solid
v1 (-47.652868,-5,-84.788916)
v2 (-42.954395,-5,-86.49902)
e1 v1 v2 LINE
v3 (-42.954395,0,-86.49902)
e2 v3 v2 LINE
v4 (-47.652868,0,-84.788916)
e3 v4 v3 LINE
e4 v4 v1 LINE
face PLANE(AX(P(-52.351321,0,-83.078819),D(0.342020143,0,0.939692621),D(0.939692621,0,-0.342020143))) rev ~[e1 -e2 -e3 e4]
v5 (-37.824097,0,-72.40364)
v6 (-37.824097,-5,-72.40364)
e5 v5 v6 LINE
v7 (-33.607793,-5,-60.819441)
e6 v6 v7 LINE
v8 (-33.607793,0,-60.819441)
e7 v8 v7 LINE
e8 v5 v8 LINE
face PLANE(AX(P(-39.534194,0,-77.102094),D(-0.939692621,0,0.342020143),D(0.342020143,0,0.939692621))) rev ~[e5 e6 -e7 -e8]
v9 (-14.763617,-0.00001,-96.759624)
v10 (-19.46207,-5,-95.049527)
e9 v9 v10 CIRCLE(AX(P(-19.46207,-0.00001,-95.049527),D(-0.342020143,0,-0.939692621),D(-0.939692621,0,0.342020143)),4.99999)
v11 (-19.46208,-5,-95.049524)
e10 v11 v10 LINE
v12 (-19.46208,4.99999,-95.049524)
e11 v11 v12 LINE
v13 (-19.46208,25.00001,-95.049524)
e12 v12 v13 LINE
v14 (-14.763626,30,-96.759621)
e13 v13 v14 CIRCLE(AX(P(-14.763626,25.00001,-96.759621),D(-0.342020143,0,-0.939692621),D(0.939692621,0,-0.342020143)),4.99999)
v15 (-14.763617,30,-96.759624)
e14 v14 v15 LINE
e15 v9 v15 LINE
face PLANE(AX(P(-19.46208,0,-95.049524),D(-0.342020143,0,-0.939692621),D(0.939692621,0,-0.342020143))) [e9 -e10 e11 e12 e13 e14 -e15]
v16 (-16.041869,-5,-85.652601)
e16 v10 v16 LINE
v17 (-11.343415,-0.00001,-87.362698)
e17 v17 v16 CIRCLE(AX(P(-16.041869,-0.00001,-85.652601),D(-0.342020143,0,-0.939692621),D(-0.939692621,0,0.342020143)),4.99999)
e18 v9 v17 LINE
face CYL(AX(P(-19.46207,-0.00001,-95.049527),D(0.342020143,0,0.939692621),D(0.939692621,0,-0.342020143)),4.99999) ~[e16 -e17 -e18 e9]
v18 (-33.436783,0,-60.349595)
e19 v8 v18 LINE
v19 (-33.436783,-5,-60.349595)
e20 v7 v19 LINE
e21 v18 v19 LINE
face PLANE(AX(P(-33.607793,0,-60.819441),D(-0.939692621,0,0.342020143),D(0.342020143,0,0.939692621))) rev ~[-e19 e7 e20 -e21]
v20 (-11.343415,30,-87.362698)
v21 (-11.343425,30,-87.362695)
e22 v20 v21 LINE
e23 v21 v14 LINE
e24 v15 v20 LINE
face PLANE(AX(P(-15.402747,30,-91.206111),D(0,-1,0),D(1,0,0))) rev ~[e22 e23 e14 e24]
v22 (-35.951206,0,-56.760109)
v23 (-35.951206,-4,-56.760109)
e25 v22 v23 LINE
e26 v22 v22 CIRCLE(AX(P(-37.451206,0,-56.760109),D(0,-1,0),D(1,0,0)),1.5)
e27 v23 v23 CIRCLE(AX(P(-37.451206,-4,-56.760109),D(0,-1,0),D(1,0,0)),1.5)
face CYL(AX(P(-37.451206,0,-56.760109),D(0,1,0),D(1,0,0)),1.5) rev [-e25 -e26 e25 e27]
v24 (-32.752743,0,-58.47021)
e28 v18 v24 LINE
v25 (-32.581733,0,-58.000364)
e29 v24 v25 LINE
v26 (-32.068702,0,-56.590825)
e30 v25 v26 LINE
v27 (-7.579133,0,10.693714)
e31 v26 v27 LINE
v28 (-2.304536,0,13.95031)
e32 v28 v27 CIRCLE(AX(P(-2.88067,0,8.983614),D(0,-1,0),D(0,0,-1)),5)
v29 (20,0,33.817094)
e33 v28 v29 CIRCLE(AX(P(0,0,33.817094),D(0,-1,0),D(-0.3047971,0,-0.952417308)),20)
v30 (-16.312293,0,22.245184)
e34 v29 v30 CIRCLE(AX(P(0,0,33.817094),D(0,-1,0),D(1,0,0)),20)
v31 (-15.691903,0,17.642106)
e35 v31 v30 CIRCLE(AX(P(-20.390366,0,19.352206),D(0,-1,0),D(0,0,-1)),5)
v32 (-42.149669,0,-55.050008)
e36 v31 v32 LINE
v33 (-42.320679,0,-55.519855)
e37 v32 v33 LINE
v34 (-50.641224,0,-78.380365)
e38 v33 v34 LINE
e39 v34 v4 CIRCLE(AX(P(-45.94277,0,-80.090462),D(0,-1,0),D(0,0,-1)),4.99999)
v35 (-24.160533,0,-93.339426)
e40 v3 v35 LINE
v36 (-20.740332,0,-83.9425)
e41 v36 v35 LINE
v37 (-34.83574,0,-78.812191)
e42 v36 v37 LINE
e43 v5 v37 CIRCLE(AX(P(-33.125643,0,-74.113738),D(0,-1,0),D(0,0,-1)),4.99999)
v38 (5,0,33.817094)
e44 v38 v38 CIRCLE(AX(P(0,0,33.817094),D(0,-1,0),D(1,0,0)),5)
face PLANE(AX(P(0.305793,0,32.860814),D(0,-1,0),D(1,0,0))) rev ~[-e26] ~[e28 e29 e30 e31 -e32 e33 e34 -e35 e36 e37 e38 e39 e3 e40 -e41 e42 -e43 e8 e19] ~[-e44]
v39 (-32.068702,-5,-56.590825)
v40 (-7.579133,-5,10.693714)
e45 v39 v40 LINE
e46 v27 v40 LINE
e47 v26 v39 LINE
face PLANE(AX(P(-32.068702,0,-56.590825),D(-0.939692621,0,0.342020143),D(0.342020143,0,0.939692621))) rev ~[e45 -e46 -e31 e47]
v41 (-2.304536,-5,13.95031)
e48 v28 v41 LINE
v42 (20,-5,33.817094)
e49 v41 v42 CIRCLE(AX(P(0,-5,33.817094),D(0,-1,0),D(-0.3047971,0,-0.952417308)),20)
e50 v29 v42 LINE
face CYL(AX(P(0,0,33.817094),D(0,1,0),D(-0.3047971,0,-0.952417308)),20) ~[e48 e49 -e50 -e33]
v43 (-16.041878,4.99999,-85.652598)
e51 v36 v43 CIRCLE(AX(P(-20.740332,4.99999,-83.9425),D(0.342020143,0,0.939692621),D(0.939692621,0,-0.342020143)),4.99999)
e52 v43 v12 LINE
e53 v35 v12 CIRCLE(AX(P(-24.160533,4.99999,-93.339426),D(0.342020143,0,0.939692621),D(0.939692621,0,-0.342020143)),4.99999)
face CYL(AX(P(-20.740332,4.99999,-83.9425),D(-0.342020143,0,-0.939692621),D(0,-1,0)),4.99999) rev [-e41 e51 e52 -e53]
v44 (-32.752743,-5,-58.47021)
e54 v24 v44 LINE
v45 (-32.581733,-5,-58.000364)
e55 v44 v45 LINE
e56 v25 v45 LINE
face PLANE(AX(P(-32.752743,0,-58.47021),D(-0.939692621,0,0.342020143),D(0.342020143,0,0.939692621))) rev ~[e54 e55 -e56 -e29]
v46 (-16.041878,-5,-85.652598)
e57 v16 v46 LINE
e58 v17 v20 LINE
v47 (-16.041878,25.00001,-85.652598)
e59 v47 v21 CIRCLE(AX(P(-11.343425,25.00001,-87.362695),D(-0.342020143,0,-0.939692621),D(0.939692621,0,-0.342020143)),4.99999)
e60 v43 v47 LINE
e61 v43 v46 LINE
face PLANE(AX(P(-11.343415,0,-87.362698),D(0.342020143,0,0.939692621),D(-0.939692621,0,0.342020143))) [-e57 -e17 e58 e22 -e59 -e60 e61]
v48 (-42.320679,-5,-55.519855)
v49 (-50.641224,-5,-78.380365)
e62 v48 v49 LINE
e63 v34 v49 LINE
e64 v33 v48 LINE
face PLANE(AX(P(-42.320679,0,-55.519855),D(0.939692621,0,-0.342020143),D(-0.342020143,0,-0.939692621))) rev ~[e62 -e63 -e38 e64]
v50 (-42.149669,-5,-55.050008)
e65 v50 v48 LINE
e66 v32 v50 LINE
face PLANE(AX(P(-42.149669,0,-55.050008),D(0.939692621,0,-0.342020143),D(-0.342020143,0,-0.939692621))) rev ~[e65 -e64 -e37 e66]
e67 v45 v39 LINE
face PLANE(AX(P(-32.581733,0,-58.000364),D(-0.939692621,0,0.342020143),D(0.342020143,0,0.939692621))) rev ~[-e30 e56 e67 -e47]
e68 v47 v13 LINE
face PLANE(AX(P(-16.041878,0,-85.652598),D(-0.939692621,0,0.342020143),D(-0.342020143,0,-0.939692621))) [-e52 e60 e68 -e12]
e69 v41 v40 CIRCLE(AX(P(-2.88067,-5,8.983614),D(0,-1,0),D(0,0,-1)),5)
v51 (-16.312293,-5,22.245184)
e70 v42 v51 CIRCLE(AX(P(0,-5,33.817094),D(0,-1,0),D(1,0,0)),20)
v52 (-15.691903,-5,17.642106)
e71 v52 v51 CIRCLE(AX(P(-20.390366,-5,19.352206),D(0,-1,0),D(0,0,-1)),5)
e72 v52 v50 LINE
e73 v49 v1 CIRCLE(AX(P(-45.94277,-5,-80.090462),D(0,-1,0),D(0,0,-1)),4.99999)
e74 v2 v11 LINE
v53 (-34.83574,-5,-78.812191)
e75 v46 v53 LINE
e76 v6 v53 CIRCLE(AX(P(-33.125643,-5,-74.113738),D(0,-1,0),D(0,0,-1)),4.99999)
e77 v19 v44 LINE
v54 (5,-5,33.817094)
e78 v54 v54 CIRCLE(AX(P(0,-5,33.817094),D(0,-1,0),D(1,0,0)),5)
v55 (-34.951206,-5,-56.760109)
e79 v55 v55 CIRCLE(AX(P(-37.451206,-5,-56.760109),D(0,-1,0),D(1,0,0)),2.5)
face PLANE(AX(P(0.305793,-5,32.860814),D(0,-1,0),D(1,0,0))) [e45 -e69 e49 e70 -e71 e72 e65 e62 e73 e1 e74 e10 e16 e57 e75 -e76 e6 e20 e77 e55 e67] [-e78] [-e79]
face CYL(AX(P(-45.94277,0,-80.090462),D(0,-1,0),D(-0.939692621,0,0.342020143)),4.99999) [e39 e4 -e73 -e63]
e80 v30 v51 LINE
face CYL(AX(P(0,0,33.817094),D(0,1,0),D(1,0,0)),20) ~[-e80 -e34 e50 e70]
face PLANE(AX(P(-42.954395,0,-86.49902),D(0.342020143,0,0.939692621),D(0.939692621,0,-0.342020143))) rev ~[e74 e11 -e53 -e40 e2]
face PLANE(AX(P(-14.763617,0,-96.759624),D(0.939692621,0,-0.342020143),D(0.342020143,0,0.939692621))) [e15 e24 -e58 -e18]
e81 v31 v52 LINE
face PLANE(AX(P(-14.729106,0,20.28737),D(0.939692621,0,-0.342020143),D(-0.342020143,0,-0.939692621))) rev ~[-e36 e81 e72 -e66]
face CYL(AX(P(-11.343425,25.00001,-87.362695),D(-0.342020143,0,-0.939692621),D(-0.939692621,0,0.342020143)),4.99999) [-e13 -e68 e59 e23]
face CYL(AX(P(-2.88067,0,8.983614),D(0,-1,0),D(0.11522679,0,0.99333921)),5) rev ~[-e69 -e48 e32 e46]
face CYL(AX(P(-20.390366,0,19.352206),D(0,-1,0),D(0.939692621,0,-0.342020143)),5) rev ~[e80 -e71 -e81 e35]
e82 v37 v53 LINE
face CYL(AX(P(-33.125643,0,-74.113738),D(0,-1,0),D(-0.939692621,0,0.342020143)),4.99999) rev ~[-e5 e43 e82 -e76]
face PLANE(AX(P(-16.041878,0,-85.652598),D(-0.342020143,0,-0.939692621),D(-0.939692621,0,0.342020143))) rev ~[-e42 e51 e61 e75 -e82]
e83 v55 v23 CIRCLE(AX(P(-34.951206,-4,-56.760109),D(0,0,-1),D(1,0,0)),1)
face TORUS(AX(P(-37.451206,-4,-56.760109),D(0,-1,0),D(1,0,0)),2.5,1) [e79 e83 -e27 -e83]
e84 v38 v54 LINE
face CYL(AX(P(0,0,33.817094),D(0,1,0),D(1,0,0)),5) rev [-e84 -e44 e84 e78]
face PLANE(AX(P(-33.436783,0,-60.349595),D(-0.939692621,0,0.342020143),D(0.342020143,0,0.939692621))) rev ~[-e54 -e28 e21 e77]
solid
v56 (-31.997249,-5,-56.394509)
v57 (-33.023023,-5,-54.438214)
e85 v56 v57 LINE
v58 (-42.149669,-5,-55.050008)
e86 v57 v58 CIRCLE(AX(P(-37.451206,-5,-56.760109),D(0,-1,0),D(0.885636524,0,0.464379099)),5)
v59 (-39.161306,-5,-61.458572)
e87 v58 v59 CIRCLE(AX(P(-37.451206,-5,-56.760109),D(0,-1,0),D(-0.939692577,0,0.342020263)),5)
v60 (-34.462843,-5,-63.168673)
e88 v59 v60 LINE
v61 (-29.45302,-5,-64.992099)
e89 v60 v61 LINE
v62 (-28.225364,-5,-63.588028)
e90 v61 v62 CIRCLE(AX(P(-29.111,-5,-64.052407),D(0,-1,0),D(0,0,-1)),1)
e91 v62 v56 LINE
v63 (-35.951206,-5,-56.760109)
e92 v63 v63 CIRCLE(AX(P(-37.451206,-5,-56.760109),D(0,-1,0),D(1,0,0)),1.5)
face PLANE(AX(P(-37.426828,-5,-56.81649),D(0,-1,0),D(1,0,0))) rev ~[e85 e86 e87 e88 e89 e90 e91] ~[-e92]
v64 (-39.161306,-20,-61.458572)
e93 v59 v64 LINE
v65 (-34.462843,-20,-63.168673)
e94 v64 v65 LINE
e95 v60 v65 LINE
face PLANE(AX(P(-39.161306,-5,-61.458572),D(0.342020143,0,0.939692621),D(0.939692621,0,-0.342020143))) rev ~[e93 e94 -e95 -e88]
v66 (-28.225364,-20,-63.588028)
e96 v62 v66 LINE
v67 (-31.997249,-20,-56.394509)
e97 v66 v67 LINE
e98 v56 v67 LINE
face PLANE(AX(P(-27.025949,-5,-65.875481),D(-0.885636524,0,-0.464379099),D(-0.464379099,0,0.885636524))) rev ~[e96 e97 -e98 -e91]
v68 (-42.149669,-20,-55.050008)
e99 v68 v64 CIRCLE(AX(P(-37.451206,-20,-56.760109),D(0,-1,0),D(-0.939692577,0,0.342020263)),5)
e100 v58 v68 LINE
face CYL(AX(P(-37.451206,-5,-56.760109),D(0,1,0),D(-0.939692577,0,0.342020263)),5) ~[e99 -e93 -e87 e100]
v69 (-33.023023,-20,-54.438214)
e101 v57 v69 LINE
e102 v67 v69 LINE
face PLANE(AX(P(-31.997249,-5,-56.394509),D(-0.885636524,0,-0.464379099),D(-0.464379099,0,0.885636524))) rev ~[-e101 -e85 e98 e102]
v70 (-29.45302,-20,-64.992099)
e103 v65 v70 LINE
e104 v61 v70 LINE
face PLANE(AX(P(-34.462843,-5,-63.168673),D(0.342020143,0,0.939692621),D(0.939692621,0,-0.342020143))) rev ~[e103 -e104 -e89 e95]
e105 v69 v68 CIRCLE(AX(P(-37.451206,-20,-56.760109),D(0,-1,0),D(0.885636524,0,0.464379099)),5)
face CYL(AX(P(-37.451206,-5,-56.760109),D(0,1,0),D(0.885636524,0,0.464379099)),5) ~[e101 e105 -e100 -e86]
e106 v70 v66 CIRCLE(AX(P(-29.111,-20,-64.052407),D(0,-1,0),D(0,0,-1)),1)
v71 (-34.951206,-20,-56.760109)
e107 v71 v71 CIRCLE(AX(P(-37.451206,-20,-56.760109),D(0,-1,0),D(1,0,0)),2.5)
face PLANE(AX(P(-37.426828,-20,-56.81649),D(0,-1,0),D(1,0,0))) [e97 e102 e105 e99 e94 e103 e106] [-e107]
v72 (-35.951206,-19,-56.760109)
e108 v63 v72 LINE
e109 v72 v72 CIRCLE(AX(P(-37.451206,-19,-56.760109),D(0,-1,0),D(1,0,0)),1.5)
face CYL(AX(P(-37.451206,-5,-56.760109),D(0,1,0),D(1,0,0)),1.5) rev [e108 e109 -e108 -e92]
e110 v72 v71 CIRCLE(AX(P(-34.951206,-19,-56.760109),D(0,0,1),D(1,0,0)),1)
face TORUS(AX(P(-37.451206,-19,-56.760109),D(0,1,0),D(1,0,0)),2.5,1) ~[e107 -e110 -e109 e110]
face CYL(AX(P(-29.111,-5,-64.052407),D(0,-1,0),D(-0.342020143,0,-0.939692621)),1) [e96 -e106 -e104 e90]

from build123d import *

# Parameters (mm, degrees)
F0_R     = 5
F0_R_2   = 1.5
F1_DEPTH = 5
F2_DEPTH = 30
F4_R     = 4.99999
F5_R     = 5
F3_R     = 1.5
F6_DEPTH = 15
F7_R     = 1
F7_2_R   = 1


# Not quite as in the source:
# - a fillet or chamfer is up to 0.001 mm smaller than in the source, because OpenCascade refuses the exact size
# - a feature names something its author has since deleted; it is built from what else it names


with BuildPart() as f1:
    # F0 (on Front) → F1 (new body)
    with BuildSketch(Plane.XZ):
        with BuildLine():
            ThreePointArc((20, 33.8170940264), (-7.2600924867, 52.4528407806), (-14.7291057085, 20.287369527))
            ThreePointArc((-14.7291057085, 20.287369527), (-10.7719287617, 16.9658166044), (-6.0959419995, 14.7687478741))
            ThreePointArc((-6.0959419995, 14.7687478741), (11.7915469725, 17.6628555734), (20, 33.8170940264))
        make_face()
        with Locations((0, 33.8170940264)):
            Circle(F0_R, mode=Mode.SUBTRACT)
        with BuildLine():
            Line((-14.7291057085, 20.287369527), (-42.1496687283, -55.0500081989))
            ThreePointArc((-42.1496687283, -55.0500081989), (-36.7371185286, -51.8113638601), (-32.4609528428, -56.4480570615))
            Line((-32.4609528428, -56.4480570615), (-32.0687023036, -56.5908245822))
            Line((-32.0687023036, -56.5908245822), (-6.0959419995, 14.7687478741))
            ThreePointArc((-6.0959419995, 14.7687478741), (-10.7719287617, 16.9658166044), (-14.7291057085, 20.287369527))
        make_face()
        with BuildLine():
            ThreePointArc((-32.4512056942, -56.7601091071), (-32.5271669199, -57.628349943), (-32.7527425538, -58.4702097236))
            Line((-32.7527425538, -58.4702097236), (-32.5817325186, -58.0003635134))
            Line((-32.5817325186, -58.0003635134), (-32.0687023036, -56.5908245822))
            Line((-32.0687023036, -56.5908245822), (-32.4609528428, -56.4480570615))
            ThreePointArc((-32.4609528428, -56.4480570615), (-32.4536430754, -56.6040069883), (-32.4512056942, -56.7601091071))
        make_face()
        with BuildLine():
            ThreePointArc((-33.8290334161, -60.2068275447), (-33.2012405407, -59.3940787717), (-32.7527425538, -58.4702097236))
            ThreePointArc((-32.7527425538, -58.4702097236), (-32.5271669199, -57.628349943), (-32.4512056942, -56.7601091071))
            ThreePointArc((-32.4512056942, -56.7601091071), (-32.4536430754, -56.6040069883), (-32.4609528428, -56.4480570615))
            ThreePointArc((-32.4609528428, -56.4480570615), (-36.7371185286, -51.8113638601), (-42.1496687283, -55.0500081989))
            ThreePointArc((-42.1496687283, -55.0500081989), (-40.0851754907, -61.0100741788), (-33.8290334161, -60.2068275447))
        make_face()
        with Locations((-37.4512056942, -56.7601091071)):
            Circle(F0_R_2, mode=Mode.SUBTRACT)
        with BuildLine():
            Line((-39.5341938332, -77.1020939848), (-33.6077929485, -60.8194413757))
            Line((-33.6077929485, -60.8194413757), (-33.4367828769, -60.3495950653))
            Line((-33.4367828769, -60.3495950653), (-33.8290334161, -60.2068275447))
            ThreePointArc((-33.8290334161, -60.2068275447), (-40.0851754907, -61.0100741788), (-42.1496687283, -55.0500081989))
            Line((-42.1496687283, -55.0500081989), (-42.3206788698, -55.5198547009))
            Line((-42.3206788698, -55.5198547009), (-52.3513214743, -83.0788187594))
            Line((-52.3513214743, -83.0788187594), (-42.9543952664, -86.4990201927))
            Line((-42.9543952664, -86.4990201927), (-39.5341938332, -77.1020939848))
        make_face()
        with BuildLine():
            Line((-33.8290334161, -60.2068275447), (-33.4367828769, -60.3495950653))
            Line((-33.4367828769, -60.3495950653), (-32.7527425538, -58.4702097236))
            ThreePointArc((-32.7527425538, -58.4702097236), (-33.2012405407, -59.3940787717), (-33.8290334161, -60.2068275447))
        make_face()
        Polygon((-16.0418783135, -85.652597568), (-39.5341938332, -77.1020939848), (-42.9543952664, -86.4990201927), (-19.4620797468, -95.0495237758), align=None)
        Polygon((-11.3434152096, -87.3626982846), (-16.0418783135, -85.652597568), (-19.4620797468, -95.0495237758), (-14.7636166428, -96.7596244924), align=None)
    extrude(amount=F1_DEPTH)

    # F0 (on Front) → F2 (join)
    with BuildSketch(Plane.XZ):
        Polygon((-11.3434152096, -87.3626982846), (-16.0418783135, -85.652597568), (-19.4620797468, -95.0495237758), (-14.7636166428, -96.7596244924), align=None)
    extrude(amount=-F2_DEPTH)

    # F4 (radius 5 in the source; OpenCascade refuses exactly that, so slightly less here)
    f4_edges = [f1.edges().sort_by_distance(p)[0] for p in [
        (-52.351321, -2.5, -83.078819),
        (-13.053516, -5, -92.061161),
        (-17.751979, 30, -90.351061),
        (-17.751979, 0, -90.351061),
        (-39.534194, -2.5, -77.102094),
    ]]
    fillet(f4_edges, radius=F4_R)

    # F5
    f5_edges = [f1.edges().sort_by_distance(p)[0] for p in [
        (-6.095942, -2.5, 14.768748),
        (-14.729106, -2.5, 20.28737),
    ]]
    fillet(f5_edges, radius=F5_R)

    # F7
    f7_edges = [f1.edges().sort_by_distance(p)[0] for p in [
        (-38.951206, -5, -56.760109),
    ]]
    fillet(f7_edges, radius=F7_R)


with BuildPart() as f6:
    # F3 (on face) → F6 (new body)
    with BuildSketch(Plane.XZ.offset(5)):
        with BuildLine():
            ThreePointArc((-32.7527426235, -58.470209915), (-32.5271669375, -57.6283500433), (-32.4512056942, -56.7601091071))
            ThreePointArc((-32.4512056942, -56.7601091071), (-32.5962642376, -55.5644739399), (-33.0230230754, -54.438213611))
            ThreePointArc((-33.0230230754, -54.438213611), (-37.7856244233, -51.7713052311), (-42.149668581, -55.050007794))
            ThreePointArc((-42.149668581, -55.050007794), (-41.9827447635, -58.8732001282), (-39.1613064108, -61.458572211))
            ThreePointArc((-39.1613064108, -61.458572211), (-35.3381144295, -61.2916480628), (-32.7527426235, -58.470209915))
        make_face()
        with Locations((-37.4512056942, -56.7601091071)):
            Circle(F3_R, mode=Mode.SUBTRACT)
        with BuildLine():
            ThreePointArc((-33.0230230754, -54.438213611), (-32.5962642376, -55.5644739399), (-32.4512056942, -56.7601091071))
            ThreePointArc((-32.4512056942, -56.7601091071), (-32.5271669375, -57.6283500433), (-32.7527426235, -58.470209915))
            Line((-32.7527426235, -58.470209915), (-31.9972492992, -56.3945090662))
            Line((-31.9972492992, -56.3945090662), (-33.0230230754, -54.438213611))
        make_face()
        with BuildLine():
            Line((-34.4628433069, -63.1686729277), (-32.7527426235, -58.470209915))
            ThreePointArc((-32.7527426235, -58.470209915), (-35.3381144295, -61.2916480628), (-39.1613064108, -61.458572211))
            Line((-39.1613064108, -61.458572211), (-34.4628433069, -63.1686729277))
        make_face()
        Polygon((-31.9972492992, -56.3945090662), (-32.7527426235, -58.470209915), (-34.4628433069, -63.1686729277), (-27.0259488145, -65.8754811583), align=None)
    extrude(amount=F6_DEPTH)

    # F7#2
    f7_2_edges = [f6.edges().sort_by_distance(p)[0] for p in [
        (-27.025949, -12.5, -65.875481),
        (-38.951206, -20, -56.760109),
    ]]
    fillet(f7_2_edges, radius=F7_2_R)


solid = Compound([f1.part, f6.part])
